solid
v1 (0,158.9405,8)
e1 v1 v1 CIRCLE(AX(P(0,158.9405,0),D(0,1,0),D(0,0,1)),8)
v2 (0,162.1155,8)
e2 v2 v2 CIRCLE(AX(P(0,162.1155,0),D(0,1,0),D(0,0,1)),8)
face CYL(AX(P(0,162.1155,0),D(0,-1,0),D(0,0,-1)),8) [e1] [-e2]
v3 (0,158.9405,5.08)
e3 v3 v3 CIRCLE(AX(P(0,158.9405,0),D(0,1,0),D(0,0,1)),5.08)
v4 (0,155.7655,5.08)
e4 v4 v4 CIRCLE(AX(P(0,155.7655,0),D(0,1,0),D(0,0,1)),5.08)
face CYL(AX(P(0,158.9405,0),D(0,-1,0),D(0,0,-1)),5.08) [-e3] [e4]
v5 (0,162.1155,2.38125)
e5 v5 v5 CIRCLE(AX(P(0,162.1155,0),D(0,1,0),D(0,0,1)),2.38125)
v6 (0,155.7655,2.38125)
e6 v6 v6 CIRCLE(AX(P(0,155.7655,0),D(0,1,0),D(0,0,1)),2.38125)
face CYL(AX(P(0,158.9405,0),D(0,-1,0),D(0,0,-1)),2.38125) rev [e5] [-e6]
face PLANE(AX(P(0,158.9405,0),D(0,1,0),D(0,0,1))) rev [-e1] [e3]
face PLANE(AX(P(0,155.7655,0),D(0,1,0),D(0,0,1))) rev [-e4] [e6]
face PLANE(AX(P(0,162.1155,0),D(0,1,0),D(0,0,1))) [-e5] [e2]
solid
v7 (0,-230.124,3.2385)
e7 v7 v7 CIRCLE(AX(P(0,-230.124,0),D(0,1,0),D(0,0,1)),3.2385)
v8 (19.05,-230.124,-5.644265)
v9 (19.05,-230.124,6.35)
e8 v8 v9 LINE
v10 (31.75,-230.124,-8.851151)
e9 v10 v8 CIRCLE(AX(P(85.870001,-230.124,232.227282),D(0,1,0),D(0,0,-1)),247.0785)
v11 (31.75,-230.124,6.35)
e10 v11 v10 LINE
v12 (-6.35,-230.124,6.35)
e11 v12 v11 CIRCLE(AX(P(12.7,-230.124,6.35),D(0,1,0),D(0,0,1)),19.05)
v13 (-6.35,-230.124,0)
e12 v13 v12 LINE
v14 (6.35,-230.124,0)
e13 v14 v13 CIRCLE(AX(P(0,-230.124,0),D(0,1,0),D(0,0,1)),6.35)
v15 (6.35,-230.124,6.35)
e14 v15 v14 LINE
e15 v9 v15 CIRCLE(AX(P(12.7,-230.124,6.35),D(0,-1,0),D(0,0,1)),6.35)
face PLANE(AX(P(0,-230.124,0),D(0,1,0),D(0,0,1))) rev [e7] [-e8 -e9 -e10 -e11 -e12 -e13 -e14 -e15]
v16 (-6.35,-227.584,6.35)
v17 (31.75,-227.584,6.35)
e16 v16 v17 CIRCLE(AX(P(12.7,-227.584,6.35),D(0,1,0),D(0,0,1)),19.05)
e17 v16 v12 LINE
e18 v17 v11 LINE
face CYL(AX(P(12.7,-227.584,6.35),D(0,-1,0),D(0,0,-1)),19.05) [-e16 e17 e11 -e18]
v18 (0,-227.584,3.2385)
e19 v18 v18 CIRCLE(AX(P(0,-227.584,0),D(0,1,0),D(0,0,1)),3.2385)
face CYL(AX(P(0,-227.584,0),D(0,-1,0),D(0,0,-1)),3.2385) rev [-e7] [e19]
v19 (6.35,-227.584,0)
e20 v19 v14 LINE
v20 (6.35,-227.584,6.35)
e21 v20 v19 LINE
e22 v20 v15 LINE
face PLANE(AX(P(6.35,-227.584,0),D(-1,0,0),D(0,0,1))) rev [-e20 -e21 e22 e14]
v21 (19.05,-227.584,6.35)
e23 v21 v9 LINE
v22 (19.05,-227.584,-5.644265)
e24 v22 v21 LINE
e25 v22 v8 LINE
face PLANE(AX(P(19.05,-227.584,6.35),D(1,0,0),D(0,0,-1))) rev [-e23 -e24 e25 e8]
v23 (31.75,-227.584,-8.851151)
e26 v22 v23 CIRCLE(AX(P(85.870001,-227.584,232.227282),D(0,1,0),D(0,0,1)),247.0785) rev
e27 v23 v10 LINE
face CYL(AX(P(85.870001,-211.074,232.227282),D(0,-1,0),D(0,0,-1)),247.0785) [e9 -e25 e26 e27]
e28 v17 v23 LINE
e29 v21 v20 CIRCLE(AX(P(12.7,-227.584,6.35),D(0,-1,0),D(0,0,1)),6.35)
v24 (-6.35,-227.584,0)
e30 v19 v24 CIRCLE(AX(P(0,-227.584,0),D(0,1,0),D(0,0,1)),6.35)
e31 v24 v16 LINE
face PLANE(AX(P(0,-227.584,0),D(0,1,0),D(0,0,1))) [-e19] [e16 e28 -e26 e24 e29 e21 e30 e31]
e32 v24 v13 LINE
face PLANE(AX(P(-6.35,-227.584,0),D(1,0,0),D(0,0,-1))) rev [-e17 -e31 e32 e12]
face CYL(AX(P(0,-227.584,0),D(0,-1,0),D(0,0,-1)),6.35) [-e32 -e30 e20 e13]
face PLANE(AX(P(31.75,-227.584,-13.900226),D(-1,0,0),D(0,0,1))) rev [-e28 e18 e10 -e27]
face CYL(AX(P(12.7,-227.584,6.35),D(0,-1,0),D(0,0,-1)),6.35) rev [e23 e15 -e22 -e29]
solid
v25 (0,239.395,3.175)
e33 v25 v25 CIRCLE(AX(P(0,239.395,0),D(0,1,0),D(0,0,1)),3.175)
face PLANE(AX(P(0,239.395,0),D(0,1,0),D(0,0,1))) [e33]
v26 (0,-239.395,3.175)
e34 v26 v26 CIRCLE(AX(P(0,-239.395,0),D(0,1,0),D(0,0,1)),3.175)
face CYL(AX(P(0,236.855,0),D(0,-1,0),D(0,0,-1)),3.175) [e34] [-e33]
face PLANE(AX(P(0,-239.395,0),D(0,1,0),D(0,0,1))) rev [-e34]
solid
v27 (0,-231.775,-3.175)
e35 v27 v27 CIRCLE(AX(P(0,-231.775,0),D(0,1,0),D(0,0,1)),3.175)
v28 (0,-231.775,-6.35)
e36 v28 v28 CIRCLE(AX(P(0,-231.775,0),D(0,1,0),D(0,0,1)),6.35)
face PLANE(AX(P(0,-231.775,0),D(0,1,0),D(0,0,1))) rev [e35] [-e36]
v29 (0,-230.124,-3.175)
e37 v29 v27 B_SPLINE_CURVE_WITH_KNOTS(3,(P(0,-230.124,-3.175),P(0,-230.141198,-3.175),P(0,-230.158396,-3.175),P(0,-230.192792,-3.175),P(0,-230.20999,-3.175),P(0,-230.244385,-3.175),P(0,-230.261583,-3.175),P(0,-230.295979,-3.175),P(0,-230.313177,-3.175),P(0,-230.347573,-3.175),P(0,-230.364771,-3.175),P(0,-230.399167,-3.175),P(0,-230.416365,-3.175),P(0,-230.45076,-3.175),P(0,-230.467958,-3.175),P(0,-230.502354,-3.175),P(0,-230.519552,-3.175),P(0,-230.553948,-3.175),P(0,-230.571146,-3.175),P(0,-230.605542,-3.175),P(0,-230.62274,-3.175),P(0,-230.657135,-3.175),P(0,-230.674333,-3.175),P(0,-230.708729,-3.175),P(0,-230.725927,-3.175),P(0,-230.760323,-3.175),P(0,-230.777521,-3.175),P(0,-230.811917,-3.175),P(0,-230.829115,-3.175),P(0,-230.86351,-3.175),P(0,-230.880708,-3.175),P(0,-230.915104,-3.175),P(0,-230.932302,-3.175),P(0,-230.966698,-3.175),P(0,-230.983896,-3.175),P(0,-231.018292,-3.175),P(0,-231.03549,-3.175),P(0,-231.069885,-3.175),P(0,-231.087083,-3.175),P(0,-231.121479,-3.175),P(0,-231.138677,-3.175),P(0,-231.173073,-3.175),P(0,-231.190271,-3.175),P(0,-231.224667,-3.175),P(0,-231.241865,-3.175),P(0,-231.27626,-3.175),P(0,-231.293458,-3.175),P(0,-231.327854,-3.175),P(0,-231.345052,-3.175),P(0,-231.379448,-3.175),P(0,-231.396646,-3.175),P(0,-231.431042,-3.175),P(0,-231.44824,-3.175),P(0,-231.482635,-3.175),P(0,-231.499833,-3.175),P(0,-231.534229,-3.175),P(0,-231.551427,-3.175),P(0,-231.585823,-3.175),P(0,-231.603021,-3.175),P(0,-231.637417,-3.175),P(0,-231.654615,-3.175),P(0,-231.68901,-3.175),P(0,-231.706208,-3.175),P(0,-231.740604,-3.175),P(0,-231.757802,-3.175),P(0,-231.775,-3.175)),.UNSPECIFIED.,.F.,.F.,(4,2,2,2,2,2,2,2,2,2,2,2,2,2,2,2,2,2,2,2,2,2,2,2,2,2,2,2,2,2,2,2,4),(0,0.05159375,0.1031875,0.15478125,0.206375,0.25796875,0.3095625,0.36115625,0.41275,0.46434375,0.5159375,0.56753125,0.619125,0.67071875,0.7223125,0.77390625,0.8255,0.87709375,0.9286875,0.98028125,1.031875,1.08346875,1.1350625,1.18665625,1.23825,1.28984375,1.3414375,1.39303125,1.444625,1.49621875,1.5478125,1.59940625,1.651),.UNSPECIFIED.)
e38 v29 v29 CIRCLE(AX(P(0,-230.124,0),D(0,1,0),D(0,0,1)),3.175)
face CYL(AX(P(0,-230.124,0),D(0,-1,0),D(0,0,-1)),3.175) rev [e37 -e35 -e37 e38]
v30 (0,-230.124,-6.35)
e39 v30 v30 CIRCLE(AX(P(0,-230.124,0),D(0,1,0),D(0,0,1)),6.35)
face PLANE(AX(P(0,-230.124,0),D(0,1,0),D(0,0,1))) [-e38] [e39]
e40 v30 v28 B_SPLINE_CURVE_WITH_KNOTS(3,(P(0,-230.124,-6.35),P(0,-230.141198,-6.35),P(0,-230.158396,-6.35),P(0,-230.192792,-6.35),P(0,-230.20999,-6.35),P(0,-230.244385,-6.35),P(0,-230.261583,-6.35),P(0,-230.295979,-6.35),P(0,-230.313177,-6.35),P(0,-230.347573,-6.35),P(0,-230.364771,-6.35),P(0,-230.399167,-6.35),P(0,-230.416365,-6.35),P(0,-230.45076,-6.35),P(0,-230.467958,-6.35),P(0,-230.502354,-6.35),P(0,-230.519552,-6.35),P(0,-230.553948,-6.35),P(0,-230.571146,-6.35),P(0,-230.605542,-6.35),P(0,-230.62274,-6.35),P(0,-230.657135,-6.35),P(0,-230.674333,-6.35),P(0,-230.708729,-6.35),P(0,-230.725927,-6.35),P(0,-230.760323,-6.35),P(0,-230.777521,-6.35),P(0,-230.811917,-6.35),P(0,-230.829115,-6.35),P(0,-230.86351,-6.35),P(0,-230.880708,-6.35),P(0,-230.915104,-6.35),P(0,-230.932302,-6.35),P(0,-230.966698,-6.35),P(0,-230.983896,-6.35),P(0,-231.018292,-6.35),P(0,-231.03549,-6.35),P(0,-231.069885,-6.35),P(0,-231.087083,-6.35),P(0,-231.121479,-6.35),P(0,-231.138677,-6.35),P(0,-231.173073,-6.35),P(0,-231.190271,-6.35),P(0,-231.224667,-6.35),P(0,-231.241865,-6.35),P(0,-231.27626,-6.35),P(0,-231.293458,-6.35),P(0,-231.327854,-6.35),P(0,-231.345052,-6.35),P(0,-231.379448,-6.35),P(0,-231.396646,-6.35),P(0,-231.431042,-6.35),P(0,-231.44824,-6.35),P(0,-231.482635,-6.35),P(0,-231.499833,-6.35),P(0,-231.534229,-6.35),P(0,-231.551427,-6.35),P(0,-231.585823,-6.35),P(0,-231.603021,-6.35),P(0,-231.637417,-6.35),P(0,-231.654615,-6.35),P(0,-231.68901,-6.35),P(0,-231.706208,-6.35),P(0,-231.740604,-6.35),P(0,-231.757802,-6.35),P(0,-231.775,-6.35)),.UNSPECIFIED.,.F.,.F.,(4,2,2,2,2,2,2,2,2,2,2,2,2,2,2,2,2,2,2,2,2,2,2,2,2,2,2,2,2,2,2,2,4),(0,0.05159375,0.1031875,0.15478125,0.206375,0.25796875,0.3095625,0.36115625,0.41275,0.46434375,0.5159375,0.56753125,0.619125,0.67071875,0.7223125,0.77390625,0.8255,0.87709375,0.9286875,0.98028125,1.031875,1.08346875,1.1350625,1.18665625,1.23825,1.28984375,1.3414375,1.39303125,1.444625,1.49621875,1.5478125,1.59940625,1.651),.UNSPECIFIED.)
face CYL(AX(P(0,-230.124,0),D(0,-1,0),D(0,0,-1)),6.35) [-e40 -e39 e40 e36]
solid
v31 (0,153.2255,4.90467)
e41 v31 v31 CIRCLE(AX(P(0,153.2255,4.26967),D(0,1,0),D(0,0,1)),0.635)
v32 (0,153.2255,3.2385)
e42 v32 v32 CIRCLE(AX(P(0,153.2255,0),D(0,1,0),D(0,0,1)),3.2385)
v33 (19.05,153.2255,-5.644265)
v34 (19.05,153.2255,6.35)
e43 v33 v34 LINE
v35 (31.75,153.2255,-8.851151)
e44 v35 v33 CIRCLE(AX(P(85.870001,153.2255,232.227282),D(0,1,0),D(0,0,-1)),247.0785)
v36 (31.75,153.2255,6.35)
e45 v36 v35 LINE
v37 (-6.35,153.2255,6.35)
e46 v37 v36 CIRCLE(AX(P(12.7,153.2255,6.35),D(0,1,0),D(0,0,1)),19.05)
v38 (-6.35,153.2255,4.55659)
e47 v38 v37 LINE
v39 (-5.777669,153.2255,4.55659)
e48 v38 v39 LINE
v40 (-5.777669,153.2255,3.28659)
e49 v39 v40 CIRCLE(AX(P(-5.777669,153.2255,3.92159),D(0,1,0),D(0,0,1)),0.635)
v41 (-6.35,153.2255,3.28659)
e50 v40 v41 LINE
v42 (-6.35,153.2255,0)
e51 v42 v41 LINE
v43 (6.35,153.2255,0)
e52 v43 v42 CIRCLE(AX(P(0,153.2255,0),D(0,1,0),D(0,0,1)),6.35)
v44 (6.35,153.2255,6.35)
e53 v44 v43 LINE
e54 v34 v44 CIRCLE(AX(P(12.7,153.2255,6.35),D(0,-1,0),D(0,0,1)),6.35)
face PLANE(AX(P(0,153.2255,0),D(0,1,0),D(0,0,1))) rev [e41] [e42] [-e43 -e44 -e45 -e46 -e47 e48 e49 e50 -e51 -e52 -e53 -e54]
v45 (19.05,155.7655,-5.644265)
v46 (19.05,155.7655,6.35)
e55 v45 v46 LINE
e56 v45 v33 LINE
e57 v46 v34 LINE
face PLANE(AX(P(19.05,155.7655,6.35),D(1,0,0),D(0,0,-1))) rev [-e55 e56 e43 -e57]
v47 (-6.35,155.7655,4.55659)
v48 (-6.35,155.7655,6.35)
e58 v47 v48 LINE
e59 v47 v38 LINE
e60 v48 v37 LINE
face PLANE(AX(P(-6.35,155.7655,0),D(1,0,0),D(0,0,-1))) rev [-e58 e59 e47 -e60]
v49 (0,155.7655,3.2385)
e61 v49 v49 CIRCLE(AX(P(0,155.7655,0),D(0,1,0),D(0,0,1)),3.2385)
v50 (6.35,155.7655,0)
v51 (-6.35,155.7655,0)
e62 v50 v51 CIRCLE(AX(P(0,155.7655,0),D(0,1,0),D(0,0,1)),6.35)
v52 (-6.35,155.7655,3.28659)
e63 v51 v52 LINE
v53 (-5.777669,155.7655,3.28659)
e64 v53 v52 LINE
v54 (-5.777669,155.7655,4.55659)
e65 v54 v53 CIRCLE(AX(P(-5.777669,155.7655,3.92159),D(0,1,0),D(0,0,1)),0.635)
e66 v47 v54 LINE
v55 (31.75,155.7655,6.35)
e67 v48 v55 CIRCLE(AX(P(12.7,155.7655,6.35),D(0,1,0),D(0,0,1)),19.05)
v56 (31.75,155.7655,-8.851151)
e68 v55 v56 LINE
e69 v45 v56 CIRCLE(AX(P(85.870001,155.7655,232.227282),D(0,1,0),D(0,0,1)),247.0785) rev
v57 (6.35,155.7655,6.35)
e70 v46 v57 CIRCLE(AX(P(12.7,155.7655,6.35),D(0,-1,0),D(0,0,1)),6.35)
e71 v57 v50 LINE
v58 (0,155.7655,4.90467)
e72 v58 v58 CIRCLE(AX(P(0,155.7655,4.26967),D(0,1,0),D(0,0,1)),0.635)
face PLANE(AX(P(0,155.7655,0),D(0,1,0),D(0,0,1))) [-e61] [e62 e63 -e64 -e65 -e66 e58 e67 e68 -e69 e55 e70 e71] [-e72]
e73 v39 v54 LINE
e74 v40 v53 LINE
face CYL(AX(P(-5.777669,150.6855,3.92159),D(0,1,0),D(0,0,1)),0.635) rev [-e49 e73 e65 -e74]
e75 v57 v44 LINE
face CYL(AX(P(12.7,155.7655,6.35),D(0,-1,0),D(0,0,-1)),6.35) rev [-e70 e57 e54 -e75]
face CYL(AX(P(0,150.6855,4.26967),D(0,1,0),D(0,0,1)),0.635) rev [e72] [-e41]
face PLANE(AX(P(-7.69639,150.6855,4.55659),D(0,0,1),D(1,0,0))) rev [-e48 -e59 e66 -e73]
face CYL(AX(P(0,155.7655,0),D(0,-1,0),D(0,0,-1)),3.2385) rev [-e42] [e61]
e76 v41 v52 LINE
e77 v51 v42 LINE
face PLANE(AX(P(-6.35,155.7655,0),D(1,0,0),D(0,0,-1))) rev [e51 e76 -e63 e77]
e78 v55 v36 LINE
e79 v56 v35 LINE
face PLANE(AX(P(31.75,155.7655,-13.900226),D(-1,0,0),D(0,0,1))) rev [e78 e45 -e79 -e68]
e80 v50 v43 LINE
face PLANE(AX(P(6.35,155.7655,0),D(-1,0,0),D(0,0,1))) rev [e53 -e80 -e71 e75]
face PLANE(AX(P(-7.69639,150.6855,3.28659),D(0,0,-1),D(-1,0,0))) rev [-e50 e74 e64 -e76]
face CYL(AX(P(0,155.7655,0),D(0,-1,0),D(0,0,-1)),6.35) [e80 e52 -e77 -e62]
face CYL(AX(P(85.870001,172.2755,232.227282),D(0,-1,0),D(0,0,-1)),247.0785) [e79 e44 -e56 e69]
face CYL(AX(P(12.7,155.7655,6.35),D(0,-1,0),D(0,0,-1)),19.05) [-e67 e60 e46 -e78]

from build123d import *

# Parameters (mm, degrees)
SKETCH1_R              = 3.175
BOSS_EXTRUDE1_DEPTH    = 236.855
SKETCH2_R              = 3.175
BOSS_EXTRUDE2_DEPTH    = 2.54
FILLET1_R              = 1
SKETCH3_R              = 6.35
SKETCH3_R_2            = 3.175
BOSS_EXTRUDE3_DEPTH    = 1.651
SKETCH4_R              = 3.175
BOSS_EXTRUDE4_DEPTH    = 2.54
CUT_EXTRUDE1_DEPTH     = 19.05
MOVE_START             = -230.124
MOVE_FACE1_OUTLINE_R   = 3.2385
MOVE_FACE1_OUTLINE_R_2 = 3.175
MOVE_FACE1_DEPTH       = 2.54
SKETCH7_R              = 5.08
SKETCH7_R_2            = 2.38125
BOSS_EXTRUDE6_DEPTH    = 3.175
SKETCH8_R              = 8
SKETCH8_R_2            = 2.38125
BOSS_EXTRUDE7_DEPTH    = 3.175
SKETCH9_R              = 0.635
CUT_EXTRUDE2_DEPTH     = 5.08
MOVE_FACE2_BY          = 2.54
MOVE_FACE2_2_BY        = 2.54


# Read off the part's stored shape, not the designer's step: Move Face1
with BuildPart() as part:
    # Sketch1 → Boss-Extrude1 (new, symmetric)
    with BuildSketch(Plane(origin=(0, 0, 0), x_dir=(1, 0, 0), z_dir=(0, 1, 0))):
        with Locations(Location((0, 0, 0), (0, 0, 270))):
            Circle(SKETCH1_R)
    extrude(amount=BOSS_EXTRUDE1_DEPTH, both=True)

    # Move Face2: a face moved outward by 2.54
    extrude(part.faces().sort_by_distance((0, -236.855, 0))[0], amount=MOVE_FACE2_BY, dir=(0, -1, 0))

    # Move Face2 2: a face moved outward by 2.54
    extrude(part.faces().sort_by_distance((0, 236.855, 0))[0], amount=MOVE_FACE2_2_BY, dir=(0, 1, 0))


with BuildPart() as body_2:
    # Sketch2 → Boss-Extrude2 (new body)
    with BuildSketch(Plane(origin=(0, 236.855, 0), x_dir=(1, 0, 0), z_dir=(0, 1, 0))):
        Polygon((3.767272711, 2.609398093), (-0.376168682, 4.567252917), (-4.143441392, 1.957854824), (-3.767272711, -2.609398093), (0.376168682, -4.567252917), (4.143441392, -1.957854824), align=None)
        with Locations(Location((0, 0, 0), (0, 0, 270))):
            Circle(SKETCH2_R, mode=Mode.SUBTRACT)
    extrude(amount=-BOSS_EXTRUDE2_DEPTH)

    # Fillet1
    # the kernel refuses this fillet: 1 mm, written as the material it takes off along each edge
    with BuildSketch(Plane(origin=(-1.678983362, 236.855, 5.990752153), x_dir=(0, -1, 0), z_dir=(0.8220608177173138, 0, -0.5693996943922096)), Plane(origin=(-6.027635233, 236.855, 1.541333832), x_dir=(0, -1, 0), z_dir=(0.9041450091094061, 0, 0.4272257044028978)), Plane(origin=(-4.348651871, 236.855, -4.449418321), x_dir=(0, -1, 0), z_dir=(0.0820841913920923, 0, 0.9966253987951073)), Plane(origin=(1.678983362, 236.855, -5.990752153), x_dir=(0, -1, 0), z_dir=(-0.8220608177173137, 0, 0.5693996943922096)), Plane(origin=(6.027635233, 236.855, -1.541333832), x_dir=(0, -1, 0), z_dir=(-0.904145009109406, 0, -0.427225704402898)), Plane(origin=(4.348651871, 236.855, 4.449418321), x_dir=(0, -1, 0), z_dir=(-0.08208419139209193, 0, -0.9966253987951073))) as fillet1_piece_1:
        with BuildLine():
            CenterArc((FILLET1_R, FILLET1_R), FILLET1_R, 180, 90)
            Line((0, FILLET1_R), (0, 0))
            Line((0, 0), (FILLET1_R, 0))
        make_face()
    extrude(amount=9.582717762, mode=Mode.SUBTRACT)


with BuildPart() as body_3:
    # Mirror1: mirrored copy
    add(body_2.part.mirror(Plane.ZX))


with BuildPart() as body_4:
    # Sketch3 → Boss-Extrude3 (new body)
    with BuildSketch(Plane(origin=(0, -231.775, 0), x_dir=(1, 0, 0), z_dir=(0, 1, 0))):
        with Locations(Location((0, 0, 0), (0, 0, 90))):
            Circle(SKETCH3_R)
        with Locations(Location((0, 0, 0), (0, 0, 90))):
            Circle(SKETCH3_R_2, mode=Mode.SUBTRACT)
    extrude(amount=BOSS_EXTRUDE3_DEPTH)


with BuildPart() as body_5:
    # Sketch4 → Boss-Extrude4 (new body)
    with BuildSketch(Plane(origin=(0, -230.124, 0), x_dir=(1, 0, 0), z_dir=(0, 1, 0))):
        with BuildLine():
            Line((6.35, 0), (6.35, -6.35))
            ThreePointArc((6.35, -6.35), (12.7, -12.7), (19.05, -6.35))
            Line((19.05, -6.35), (19.05, 13.900226486))
            Line((19.05, 13.900226486), (31.75, 13.900226486))
            Line((31.75, 13.900226486), (31.75, -6.35))
            ThreePointArc((31.75, -6.35), (12.7, -25.4), (-6.35, -6.35))
            Line((-6.35, -6.35), (-6.35, 0))
            ThreePointArc((-6.35, 0), (0, 6.35), (6.35, 0))
        make_face()
        with Locations(Location((0, 0, 0), (0, 0, 270))):
            Circle(SKETCH4_R, mode=Mode.SUBTRACT)
    extrude(amount=BOSS_EXTRUDE4_DEPTH)

    # Sketch5 → Cut-Extrude1 (cut)
    with BuildSketch(Plane.XZ.offset(230.124)):
        with BuildLine():
            Line((19.05, -5.644264501), (19.05, -13.900226486))
            Line((19.05, -13.900226486), (31.75, -13.900226486))
            Line((31.75, -13.900226486), (31.75, -8.851150591))
            ThreePointArc((31.75, -8.851150591), (25.378745016, -7.331882129), (19.05, -5.644264501))
        make_face()
    extrude(amount=-CUT_EXTRUDE1_DEPTH, mode=Mode.SUBTRACT)

    # Move Face1 outline → Move Face1 (cut)
    with BuildSketch(Plane(origin=(0, 0, 0), x_dir=(1, 0, 0), z_dir=(0, 1, 0)).offset(MOVE_START)):
        Circle(MOVE_FACE1_OUTLINE_R)
        Circle(MOVE_FACE1_OUTLINE_R_2, mode=Mode.SUBTRACT)
    extrude(amount=MOVE_FACE1_DEPTH, mode=Mode.SUBTRACT)


with BuildPart() as body_6:
    # Body-Move/Copy1: copy of body 5
    add(body_5.part.moved(Location((0, 383.3495, 0))))

    # Sketch9 → Cut-Extrude2 (cut)
    with BuildSketch(Plane(origin=(0, 155.7655, 0), x_dir=(1, 0, 0), z_dir=(0, 1, 0))):
        with Locations(Location((0, -4.269670425, 0), (0, 0, 270))):
            Circle(SKETCH9_R)
        with BuildLine():
            Line((-7.696390017, -3.286590368), (-5.777668953, -3.286590368))
            ThreePointArc((-5.777668953, -3.286590368), (-5.142668953, -3.921590368), (-5.777668953, -4.556590368))
            Line((-5.777668953, -4.556590368), (-7.696390017, -4.556590368))
            ThreePointArc((-7.696390017, -4.556590368), (-8.331390017, -3.921590368), (-7.696390017, -3.286590368))
        make_face()
    extrude(amount=-CUT_EXTRUDE2_DEPTH, mode=Mode.SUBTRACT)


with BuildPart() as body_7:
    # Sketch7 → Boss-Extrude6 (new body)
    with BuildSketch(Plane(origin=(0, 155.7655, 0), x_dir=(1, 0, 0), z_dir=(0, 1, 0))):
        with Locations(Location((0, 0, 0), (0, 0, 270))):
            Circle(SKETCH7_R)
        with Locations(Location((0, 0, 0), (0, 0, 270))):
            Circle(SKETCH7_R_2, mode=Mode.SUBTRACT)
    extrude(amount=BOSS_EXTRUDE6_DEPTH)

    # Sketch8 → Boss-Extrude7 (add)
    with BuildSketch(Plane(origin=(0, 158.9405, 0), x_dir=(1, 0, 0), z_dir=(0, 1, 0))):
        with Locations(Location((0, 0, 0), (0, 0, 270))):
            Circle(SKETCH8_R)
        with Locations(Location((0, 0, 0), (0, 0, 270))):
            Circle(SKETCH8_R_2, mode=Mode.SUBTRACT)
    extrude(amount=BOSS_EXTRUDE7_DEPTH)


solid = Compound([part.part, body_4.part, body_5.part, body_6.part, body_7.part])
